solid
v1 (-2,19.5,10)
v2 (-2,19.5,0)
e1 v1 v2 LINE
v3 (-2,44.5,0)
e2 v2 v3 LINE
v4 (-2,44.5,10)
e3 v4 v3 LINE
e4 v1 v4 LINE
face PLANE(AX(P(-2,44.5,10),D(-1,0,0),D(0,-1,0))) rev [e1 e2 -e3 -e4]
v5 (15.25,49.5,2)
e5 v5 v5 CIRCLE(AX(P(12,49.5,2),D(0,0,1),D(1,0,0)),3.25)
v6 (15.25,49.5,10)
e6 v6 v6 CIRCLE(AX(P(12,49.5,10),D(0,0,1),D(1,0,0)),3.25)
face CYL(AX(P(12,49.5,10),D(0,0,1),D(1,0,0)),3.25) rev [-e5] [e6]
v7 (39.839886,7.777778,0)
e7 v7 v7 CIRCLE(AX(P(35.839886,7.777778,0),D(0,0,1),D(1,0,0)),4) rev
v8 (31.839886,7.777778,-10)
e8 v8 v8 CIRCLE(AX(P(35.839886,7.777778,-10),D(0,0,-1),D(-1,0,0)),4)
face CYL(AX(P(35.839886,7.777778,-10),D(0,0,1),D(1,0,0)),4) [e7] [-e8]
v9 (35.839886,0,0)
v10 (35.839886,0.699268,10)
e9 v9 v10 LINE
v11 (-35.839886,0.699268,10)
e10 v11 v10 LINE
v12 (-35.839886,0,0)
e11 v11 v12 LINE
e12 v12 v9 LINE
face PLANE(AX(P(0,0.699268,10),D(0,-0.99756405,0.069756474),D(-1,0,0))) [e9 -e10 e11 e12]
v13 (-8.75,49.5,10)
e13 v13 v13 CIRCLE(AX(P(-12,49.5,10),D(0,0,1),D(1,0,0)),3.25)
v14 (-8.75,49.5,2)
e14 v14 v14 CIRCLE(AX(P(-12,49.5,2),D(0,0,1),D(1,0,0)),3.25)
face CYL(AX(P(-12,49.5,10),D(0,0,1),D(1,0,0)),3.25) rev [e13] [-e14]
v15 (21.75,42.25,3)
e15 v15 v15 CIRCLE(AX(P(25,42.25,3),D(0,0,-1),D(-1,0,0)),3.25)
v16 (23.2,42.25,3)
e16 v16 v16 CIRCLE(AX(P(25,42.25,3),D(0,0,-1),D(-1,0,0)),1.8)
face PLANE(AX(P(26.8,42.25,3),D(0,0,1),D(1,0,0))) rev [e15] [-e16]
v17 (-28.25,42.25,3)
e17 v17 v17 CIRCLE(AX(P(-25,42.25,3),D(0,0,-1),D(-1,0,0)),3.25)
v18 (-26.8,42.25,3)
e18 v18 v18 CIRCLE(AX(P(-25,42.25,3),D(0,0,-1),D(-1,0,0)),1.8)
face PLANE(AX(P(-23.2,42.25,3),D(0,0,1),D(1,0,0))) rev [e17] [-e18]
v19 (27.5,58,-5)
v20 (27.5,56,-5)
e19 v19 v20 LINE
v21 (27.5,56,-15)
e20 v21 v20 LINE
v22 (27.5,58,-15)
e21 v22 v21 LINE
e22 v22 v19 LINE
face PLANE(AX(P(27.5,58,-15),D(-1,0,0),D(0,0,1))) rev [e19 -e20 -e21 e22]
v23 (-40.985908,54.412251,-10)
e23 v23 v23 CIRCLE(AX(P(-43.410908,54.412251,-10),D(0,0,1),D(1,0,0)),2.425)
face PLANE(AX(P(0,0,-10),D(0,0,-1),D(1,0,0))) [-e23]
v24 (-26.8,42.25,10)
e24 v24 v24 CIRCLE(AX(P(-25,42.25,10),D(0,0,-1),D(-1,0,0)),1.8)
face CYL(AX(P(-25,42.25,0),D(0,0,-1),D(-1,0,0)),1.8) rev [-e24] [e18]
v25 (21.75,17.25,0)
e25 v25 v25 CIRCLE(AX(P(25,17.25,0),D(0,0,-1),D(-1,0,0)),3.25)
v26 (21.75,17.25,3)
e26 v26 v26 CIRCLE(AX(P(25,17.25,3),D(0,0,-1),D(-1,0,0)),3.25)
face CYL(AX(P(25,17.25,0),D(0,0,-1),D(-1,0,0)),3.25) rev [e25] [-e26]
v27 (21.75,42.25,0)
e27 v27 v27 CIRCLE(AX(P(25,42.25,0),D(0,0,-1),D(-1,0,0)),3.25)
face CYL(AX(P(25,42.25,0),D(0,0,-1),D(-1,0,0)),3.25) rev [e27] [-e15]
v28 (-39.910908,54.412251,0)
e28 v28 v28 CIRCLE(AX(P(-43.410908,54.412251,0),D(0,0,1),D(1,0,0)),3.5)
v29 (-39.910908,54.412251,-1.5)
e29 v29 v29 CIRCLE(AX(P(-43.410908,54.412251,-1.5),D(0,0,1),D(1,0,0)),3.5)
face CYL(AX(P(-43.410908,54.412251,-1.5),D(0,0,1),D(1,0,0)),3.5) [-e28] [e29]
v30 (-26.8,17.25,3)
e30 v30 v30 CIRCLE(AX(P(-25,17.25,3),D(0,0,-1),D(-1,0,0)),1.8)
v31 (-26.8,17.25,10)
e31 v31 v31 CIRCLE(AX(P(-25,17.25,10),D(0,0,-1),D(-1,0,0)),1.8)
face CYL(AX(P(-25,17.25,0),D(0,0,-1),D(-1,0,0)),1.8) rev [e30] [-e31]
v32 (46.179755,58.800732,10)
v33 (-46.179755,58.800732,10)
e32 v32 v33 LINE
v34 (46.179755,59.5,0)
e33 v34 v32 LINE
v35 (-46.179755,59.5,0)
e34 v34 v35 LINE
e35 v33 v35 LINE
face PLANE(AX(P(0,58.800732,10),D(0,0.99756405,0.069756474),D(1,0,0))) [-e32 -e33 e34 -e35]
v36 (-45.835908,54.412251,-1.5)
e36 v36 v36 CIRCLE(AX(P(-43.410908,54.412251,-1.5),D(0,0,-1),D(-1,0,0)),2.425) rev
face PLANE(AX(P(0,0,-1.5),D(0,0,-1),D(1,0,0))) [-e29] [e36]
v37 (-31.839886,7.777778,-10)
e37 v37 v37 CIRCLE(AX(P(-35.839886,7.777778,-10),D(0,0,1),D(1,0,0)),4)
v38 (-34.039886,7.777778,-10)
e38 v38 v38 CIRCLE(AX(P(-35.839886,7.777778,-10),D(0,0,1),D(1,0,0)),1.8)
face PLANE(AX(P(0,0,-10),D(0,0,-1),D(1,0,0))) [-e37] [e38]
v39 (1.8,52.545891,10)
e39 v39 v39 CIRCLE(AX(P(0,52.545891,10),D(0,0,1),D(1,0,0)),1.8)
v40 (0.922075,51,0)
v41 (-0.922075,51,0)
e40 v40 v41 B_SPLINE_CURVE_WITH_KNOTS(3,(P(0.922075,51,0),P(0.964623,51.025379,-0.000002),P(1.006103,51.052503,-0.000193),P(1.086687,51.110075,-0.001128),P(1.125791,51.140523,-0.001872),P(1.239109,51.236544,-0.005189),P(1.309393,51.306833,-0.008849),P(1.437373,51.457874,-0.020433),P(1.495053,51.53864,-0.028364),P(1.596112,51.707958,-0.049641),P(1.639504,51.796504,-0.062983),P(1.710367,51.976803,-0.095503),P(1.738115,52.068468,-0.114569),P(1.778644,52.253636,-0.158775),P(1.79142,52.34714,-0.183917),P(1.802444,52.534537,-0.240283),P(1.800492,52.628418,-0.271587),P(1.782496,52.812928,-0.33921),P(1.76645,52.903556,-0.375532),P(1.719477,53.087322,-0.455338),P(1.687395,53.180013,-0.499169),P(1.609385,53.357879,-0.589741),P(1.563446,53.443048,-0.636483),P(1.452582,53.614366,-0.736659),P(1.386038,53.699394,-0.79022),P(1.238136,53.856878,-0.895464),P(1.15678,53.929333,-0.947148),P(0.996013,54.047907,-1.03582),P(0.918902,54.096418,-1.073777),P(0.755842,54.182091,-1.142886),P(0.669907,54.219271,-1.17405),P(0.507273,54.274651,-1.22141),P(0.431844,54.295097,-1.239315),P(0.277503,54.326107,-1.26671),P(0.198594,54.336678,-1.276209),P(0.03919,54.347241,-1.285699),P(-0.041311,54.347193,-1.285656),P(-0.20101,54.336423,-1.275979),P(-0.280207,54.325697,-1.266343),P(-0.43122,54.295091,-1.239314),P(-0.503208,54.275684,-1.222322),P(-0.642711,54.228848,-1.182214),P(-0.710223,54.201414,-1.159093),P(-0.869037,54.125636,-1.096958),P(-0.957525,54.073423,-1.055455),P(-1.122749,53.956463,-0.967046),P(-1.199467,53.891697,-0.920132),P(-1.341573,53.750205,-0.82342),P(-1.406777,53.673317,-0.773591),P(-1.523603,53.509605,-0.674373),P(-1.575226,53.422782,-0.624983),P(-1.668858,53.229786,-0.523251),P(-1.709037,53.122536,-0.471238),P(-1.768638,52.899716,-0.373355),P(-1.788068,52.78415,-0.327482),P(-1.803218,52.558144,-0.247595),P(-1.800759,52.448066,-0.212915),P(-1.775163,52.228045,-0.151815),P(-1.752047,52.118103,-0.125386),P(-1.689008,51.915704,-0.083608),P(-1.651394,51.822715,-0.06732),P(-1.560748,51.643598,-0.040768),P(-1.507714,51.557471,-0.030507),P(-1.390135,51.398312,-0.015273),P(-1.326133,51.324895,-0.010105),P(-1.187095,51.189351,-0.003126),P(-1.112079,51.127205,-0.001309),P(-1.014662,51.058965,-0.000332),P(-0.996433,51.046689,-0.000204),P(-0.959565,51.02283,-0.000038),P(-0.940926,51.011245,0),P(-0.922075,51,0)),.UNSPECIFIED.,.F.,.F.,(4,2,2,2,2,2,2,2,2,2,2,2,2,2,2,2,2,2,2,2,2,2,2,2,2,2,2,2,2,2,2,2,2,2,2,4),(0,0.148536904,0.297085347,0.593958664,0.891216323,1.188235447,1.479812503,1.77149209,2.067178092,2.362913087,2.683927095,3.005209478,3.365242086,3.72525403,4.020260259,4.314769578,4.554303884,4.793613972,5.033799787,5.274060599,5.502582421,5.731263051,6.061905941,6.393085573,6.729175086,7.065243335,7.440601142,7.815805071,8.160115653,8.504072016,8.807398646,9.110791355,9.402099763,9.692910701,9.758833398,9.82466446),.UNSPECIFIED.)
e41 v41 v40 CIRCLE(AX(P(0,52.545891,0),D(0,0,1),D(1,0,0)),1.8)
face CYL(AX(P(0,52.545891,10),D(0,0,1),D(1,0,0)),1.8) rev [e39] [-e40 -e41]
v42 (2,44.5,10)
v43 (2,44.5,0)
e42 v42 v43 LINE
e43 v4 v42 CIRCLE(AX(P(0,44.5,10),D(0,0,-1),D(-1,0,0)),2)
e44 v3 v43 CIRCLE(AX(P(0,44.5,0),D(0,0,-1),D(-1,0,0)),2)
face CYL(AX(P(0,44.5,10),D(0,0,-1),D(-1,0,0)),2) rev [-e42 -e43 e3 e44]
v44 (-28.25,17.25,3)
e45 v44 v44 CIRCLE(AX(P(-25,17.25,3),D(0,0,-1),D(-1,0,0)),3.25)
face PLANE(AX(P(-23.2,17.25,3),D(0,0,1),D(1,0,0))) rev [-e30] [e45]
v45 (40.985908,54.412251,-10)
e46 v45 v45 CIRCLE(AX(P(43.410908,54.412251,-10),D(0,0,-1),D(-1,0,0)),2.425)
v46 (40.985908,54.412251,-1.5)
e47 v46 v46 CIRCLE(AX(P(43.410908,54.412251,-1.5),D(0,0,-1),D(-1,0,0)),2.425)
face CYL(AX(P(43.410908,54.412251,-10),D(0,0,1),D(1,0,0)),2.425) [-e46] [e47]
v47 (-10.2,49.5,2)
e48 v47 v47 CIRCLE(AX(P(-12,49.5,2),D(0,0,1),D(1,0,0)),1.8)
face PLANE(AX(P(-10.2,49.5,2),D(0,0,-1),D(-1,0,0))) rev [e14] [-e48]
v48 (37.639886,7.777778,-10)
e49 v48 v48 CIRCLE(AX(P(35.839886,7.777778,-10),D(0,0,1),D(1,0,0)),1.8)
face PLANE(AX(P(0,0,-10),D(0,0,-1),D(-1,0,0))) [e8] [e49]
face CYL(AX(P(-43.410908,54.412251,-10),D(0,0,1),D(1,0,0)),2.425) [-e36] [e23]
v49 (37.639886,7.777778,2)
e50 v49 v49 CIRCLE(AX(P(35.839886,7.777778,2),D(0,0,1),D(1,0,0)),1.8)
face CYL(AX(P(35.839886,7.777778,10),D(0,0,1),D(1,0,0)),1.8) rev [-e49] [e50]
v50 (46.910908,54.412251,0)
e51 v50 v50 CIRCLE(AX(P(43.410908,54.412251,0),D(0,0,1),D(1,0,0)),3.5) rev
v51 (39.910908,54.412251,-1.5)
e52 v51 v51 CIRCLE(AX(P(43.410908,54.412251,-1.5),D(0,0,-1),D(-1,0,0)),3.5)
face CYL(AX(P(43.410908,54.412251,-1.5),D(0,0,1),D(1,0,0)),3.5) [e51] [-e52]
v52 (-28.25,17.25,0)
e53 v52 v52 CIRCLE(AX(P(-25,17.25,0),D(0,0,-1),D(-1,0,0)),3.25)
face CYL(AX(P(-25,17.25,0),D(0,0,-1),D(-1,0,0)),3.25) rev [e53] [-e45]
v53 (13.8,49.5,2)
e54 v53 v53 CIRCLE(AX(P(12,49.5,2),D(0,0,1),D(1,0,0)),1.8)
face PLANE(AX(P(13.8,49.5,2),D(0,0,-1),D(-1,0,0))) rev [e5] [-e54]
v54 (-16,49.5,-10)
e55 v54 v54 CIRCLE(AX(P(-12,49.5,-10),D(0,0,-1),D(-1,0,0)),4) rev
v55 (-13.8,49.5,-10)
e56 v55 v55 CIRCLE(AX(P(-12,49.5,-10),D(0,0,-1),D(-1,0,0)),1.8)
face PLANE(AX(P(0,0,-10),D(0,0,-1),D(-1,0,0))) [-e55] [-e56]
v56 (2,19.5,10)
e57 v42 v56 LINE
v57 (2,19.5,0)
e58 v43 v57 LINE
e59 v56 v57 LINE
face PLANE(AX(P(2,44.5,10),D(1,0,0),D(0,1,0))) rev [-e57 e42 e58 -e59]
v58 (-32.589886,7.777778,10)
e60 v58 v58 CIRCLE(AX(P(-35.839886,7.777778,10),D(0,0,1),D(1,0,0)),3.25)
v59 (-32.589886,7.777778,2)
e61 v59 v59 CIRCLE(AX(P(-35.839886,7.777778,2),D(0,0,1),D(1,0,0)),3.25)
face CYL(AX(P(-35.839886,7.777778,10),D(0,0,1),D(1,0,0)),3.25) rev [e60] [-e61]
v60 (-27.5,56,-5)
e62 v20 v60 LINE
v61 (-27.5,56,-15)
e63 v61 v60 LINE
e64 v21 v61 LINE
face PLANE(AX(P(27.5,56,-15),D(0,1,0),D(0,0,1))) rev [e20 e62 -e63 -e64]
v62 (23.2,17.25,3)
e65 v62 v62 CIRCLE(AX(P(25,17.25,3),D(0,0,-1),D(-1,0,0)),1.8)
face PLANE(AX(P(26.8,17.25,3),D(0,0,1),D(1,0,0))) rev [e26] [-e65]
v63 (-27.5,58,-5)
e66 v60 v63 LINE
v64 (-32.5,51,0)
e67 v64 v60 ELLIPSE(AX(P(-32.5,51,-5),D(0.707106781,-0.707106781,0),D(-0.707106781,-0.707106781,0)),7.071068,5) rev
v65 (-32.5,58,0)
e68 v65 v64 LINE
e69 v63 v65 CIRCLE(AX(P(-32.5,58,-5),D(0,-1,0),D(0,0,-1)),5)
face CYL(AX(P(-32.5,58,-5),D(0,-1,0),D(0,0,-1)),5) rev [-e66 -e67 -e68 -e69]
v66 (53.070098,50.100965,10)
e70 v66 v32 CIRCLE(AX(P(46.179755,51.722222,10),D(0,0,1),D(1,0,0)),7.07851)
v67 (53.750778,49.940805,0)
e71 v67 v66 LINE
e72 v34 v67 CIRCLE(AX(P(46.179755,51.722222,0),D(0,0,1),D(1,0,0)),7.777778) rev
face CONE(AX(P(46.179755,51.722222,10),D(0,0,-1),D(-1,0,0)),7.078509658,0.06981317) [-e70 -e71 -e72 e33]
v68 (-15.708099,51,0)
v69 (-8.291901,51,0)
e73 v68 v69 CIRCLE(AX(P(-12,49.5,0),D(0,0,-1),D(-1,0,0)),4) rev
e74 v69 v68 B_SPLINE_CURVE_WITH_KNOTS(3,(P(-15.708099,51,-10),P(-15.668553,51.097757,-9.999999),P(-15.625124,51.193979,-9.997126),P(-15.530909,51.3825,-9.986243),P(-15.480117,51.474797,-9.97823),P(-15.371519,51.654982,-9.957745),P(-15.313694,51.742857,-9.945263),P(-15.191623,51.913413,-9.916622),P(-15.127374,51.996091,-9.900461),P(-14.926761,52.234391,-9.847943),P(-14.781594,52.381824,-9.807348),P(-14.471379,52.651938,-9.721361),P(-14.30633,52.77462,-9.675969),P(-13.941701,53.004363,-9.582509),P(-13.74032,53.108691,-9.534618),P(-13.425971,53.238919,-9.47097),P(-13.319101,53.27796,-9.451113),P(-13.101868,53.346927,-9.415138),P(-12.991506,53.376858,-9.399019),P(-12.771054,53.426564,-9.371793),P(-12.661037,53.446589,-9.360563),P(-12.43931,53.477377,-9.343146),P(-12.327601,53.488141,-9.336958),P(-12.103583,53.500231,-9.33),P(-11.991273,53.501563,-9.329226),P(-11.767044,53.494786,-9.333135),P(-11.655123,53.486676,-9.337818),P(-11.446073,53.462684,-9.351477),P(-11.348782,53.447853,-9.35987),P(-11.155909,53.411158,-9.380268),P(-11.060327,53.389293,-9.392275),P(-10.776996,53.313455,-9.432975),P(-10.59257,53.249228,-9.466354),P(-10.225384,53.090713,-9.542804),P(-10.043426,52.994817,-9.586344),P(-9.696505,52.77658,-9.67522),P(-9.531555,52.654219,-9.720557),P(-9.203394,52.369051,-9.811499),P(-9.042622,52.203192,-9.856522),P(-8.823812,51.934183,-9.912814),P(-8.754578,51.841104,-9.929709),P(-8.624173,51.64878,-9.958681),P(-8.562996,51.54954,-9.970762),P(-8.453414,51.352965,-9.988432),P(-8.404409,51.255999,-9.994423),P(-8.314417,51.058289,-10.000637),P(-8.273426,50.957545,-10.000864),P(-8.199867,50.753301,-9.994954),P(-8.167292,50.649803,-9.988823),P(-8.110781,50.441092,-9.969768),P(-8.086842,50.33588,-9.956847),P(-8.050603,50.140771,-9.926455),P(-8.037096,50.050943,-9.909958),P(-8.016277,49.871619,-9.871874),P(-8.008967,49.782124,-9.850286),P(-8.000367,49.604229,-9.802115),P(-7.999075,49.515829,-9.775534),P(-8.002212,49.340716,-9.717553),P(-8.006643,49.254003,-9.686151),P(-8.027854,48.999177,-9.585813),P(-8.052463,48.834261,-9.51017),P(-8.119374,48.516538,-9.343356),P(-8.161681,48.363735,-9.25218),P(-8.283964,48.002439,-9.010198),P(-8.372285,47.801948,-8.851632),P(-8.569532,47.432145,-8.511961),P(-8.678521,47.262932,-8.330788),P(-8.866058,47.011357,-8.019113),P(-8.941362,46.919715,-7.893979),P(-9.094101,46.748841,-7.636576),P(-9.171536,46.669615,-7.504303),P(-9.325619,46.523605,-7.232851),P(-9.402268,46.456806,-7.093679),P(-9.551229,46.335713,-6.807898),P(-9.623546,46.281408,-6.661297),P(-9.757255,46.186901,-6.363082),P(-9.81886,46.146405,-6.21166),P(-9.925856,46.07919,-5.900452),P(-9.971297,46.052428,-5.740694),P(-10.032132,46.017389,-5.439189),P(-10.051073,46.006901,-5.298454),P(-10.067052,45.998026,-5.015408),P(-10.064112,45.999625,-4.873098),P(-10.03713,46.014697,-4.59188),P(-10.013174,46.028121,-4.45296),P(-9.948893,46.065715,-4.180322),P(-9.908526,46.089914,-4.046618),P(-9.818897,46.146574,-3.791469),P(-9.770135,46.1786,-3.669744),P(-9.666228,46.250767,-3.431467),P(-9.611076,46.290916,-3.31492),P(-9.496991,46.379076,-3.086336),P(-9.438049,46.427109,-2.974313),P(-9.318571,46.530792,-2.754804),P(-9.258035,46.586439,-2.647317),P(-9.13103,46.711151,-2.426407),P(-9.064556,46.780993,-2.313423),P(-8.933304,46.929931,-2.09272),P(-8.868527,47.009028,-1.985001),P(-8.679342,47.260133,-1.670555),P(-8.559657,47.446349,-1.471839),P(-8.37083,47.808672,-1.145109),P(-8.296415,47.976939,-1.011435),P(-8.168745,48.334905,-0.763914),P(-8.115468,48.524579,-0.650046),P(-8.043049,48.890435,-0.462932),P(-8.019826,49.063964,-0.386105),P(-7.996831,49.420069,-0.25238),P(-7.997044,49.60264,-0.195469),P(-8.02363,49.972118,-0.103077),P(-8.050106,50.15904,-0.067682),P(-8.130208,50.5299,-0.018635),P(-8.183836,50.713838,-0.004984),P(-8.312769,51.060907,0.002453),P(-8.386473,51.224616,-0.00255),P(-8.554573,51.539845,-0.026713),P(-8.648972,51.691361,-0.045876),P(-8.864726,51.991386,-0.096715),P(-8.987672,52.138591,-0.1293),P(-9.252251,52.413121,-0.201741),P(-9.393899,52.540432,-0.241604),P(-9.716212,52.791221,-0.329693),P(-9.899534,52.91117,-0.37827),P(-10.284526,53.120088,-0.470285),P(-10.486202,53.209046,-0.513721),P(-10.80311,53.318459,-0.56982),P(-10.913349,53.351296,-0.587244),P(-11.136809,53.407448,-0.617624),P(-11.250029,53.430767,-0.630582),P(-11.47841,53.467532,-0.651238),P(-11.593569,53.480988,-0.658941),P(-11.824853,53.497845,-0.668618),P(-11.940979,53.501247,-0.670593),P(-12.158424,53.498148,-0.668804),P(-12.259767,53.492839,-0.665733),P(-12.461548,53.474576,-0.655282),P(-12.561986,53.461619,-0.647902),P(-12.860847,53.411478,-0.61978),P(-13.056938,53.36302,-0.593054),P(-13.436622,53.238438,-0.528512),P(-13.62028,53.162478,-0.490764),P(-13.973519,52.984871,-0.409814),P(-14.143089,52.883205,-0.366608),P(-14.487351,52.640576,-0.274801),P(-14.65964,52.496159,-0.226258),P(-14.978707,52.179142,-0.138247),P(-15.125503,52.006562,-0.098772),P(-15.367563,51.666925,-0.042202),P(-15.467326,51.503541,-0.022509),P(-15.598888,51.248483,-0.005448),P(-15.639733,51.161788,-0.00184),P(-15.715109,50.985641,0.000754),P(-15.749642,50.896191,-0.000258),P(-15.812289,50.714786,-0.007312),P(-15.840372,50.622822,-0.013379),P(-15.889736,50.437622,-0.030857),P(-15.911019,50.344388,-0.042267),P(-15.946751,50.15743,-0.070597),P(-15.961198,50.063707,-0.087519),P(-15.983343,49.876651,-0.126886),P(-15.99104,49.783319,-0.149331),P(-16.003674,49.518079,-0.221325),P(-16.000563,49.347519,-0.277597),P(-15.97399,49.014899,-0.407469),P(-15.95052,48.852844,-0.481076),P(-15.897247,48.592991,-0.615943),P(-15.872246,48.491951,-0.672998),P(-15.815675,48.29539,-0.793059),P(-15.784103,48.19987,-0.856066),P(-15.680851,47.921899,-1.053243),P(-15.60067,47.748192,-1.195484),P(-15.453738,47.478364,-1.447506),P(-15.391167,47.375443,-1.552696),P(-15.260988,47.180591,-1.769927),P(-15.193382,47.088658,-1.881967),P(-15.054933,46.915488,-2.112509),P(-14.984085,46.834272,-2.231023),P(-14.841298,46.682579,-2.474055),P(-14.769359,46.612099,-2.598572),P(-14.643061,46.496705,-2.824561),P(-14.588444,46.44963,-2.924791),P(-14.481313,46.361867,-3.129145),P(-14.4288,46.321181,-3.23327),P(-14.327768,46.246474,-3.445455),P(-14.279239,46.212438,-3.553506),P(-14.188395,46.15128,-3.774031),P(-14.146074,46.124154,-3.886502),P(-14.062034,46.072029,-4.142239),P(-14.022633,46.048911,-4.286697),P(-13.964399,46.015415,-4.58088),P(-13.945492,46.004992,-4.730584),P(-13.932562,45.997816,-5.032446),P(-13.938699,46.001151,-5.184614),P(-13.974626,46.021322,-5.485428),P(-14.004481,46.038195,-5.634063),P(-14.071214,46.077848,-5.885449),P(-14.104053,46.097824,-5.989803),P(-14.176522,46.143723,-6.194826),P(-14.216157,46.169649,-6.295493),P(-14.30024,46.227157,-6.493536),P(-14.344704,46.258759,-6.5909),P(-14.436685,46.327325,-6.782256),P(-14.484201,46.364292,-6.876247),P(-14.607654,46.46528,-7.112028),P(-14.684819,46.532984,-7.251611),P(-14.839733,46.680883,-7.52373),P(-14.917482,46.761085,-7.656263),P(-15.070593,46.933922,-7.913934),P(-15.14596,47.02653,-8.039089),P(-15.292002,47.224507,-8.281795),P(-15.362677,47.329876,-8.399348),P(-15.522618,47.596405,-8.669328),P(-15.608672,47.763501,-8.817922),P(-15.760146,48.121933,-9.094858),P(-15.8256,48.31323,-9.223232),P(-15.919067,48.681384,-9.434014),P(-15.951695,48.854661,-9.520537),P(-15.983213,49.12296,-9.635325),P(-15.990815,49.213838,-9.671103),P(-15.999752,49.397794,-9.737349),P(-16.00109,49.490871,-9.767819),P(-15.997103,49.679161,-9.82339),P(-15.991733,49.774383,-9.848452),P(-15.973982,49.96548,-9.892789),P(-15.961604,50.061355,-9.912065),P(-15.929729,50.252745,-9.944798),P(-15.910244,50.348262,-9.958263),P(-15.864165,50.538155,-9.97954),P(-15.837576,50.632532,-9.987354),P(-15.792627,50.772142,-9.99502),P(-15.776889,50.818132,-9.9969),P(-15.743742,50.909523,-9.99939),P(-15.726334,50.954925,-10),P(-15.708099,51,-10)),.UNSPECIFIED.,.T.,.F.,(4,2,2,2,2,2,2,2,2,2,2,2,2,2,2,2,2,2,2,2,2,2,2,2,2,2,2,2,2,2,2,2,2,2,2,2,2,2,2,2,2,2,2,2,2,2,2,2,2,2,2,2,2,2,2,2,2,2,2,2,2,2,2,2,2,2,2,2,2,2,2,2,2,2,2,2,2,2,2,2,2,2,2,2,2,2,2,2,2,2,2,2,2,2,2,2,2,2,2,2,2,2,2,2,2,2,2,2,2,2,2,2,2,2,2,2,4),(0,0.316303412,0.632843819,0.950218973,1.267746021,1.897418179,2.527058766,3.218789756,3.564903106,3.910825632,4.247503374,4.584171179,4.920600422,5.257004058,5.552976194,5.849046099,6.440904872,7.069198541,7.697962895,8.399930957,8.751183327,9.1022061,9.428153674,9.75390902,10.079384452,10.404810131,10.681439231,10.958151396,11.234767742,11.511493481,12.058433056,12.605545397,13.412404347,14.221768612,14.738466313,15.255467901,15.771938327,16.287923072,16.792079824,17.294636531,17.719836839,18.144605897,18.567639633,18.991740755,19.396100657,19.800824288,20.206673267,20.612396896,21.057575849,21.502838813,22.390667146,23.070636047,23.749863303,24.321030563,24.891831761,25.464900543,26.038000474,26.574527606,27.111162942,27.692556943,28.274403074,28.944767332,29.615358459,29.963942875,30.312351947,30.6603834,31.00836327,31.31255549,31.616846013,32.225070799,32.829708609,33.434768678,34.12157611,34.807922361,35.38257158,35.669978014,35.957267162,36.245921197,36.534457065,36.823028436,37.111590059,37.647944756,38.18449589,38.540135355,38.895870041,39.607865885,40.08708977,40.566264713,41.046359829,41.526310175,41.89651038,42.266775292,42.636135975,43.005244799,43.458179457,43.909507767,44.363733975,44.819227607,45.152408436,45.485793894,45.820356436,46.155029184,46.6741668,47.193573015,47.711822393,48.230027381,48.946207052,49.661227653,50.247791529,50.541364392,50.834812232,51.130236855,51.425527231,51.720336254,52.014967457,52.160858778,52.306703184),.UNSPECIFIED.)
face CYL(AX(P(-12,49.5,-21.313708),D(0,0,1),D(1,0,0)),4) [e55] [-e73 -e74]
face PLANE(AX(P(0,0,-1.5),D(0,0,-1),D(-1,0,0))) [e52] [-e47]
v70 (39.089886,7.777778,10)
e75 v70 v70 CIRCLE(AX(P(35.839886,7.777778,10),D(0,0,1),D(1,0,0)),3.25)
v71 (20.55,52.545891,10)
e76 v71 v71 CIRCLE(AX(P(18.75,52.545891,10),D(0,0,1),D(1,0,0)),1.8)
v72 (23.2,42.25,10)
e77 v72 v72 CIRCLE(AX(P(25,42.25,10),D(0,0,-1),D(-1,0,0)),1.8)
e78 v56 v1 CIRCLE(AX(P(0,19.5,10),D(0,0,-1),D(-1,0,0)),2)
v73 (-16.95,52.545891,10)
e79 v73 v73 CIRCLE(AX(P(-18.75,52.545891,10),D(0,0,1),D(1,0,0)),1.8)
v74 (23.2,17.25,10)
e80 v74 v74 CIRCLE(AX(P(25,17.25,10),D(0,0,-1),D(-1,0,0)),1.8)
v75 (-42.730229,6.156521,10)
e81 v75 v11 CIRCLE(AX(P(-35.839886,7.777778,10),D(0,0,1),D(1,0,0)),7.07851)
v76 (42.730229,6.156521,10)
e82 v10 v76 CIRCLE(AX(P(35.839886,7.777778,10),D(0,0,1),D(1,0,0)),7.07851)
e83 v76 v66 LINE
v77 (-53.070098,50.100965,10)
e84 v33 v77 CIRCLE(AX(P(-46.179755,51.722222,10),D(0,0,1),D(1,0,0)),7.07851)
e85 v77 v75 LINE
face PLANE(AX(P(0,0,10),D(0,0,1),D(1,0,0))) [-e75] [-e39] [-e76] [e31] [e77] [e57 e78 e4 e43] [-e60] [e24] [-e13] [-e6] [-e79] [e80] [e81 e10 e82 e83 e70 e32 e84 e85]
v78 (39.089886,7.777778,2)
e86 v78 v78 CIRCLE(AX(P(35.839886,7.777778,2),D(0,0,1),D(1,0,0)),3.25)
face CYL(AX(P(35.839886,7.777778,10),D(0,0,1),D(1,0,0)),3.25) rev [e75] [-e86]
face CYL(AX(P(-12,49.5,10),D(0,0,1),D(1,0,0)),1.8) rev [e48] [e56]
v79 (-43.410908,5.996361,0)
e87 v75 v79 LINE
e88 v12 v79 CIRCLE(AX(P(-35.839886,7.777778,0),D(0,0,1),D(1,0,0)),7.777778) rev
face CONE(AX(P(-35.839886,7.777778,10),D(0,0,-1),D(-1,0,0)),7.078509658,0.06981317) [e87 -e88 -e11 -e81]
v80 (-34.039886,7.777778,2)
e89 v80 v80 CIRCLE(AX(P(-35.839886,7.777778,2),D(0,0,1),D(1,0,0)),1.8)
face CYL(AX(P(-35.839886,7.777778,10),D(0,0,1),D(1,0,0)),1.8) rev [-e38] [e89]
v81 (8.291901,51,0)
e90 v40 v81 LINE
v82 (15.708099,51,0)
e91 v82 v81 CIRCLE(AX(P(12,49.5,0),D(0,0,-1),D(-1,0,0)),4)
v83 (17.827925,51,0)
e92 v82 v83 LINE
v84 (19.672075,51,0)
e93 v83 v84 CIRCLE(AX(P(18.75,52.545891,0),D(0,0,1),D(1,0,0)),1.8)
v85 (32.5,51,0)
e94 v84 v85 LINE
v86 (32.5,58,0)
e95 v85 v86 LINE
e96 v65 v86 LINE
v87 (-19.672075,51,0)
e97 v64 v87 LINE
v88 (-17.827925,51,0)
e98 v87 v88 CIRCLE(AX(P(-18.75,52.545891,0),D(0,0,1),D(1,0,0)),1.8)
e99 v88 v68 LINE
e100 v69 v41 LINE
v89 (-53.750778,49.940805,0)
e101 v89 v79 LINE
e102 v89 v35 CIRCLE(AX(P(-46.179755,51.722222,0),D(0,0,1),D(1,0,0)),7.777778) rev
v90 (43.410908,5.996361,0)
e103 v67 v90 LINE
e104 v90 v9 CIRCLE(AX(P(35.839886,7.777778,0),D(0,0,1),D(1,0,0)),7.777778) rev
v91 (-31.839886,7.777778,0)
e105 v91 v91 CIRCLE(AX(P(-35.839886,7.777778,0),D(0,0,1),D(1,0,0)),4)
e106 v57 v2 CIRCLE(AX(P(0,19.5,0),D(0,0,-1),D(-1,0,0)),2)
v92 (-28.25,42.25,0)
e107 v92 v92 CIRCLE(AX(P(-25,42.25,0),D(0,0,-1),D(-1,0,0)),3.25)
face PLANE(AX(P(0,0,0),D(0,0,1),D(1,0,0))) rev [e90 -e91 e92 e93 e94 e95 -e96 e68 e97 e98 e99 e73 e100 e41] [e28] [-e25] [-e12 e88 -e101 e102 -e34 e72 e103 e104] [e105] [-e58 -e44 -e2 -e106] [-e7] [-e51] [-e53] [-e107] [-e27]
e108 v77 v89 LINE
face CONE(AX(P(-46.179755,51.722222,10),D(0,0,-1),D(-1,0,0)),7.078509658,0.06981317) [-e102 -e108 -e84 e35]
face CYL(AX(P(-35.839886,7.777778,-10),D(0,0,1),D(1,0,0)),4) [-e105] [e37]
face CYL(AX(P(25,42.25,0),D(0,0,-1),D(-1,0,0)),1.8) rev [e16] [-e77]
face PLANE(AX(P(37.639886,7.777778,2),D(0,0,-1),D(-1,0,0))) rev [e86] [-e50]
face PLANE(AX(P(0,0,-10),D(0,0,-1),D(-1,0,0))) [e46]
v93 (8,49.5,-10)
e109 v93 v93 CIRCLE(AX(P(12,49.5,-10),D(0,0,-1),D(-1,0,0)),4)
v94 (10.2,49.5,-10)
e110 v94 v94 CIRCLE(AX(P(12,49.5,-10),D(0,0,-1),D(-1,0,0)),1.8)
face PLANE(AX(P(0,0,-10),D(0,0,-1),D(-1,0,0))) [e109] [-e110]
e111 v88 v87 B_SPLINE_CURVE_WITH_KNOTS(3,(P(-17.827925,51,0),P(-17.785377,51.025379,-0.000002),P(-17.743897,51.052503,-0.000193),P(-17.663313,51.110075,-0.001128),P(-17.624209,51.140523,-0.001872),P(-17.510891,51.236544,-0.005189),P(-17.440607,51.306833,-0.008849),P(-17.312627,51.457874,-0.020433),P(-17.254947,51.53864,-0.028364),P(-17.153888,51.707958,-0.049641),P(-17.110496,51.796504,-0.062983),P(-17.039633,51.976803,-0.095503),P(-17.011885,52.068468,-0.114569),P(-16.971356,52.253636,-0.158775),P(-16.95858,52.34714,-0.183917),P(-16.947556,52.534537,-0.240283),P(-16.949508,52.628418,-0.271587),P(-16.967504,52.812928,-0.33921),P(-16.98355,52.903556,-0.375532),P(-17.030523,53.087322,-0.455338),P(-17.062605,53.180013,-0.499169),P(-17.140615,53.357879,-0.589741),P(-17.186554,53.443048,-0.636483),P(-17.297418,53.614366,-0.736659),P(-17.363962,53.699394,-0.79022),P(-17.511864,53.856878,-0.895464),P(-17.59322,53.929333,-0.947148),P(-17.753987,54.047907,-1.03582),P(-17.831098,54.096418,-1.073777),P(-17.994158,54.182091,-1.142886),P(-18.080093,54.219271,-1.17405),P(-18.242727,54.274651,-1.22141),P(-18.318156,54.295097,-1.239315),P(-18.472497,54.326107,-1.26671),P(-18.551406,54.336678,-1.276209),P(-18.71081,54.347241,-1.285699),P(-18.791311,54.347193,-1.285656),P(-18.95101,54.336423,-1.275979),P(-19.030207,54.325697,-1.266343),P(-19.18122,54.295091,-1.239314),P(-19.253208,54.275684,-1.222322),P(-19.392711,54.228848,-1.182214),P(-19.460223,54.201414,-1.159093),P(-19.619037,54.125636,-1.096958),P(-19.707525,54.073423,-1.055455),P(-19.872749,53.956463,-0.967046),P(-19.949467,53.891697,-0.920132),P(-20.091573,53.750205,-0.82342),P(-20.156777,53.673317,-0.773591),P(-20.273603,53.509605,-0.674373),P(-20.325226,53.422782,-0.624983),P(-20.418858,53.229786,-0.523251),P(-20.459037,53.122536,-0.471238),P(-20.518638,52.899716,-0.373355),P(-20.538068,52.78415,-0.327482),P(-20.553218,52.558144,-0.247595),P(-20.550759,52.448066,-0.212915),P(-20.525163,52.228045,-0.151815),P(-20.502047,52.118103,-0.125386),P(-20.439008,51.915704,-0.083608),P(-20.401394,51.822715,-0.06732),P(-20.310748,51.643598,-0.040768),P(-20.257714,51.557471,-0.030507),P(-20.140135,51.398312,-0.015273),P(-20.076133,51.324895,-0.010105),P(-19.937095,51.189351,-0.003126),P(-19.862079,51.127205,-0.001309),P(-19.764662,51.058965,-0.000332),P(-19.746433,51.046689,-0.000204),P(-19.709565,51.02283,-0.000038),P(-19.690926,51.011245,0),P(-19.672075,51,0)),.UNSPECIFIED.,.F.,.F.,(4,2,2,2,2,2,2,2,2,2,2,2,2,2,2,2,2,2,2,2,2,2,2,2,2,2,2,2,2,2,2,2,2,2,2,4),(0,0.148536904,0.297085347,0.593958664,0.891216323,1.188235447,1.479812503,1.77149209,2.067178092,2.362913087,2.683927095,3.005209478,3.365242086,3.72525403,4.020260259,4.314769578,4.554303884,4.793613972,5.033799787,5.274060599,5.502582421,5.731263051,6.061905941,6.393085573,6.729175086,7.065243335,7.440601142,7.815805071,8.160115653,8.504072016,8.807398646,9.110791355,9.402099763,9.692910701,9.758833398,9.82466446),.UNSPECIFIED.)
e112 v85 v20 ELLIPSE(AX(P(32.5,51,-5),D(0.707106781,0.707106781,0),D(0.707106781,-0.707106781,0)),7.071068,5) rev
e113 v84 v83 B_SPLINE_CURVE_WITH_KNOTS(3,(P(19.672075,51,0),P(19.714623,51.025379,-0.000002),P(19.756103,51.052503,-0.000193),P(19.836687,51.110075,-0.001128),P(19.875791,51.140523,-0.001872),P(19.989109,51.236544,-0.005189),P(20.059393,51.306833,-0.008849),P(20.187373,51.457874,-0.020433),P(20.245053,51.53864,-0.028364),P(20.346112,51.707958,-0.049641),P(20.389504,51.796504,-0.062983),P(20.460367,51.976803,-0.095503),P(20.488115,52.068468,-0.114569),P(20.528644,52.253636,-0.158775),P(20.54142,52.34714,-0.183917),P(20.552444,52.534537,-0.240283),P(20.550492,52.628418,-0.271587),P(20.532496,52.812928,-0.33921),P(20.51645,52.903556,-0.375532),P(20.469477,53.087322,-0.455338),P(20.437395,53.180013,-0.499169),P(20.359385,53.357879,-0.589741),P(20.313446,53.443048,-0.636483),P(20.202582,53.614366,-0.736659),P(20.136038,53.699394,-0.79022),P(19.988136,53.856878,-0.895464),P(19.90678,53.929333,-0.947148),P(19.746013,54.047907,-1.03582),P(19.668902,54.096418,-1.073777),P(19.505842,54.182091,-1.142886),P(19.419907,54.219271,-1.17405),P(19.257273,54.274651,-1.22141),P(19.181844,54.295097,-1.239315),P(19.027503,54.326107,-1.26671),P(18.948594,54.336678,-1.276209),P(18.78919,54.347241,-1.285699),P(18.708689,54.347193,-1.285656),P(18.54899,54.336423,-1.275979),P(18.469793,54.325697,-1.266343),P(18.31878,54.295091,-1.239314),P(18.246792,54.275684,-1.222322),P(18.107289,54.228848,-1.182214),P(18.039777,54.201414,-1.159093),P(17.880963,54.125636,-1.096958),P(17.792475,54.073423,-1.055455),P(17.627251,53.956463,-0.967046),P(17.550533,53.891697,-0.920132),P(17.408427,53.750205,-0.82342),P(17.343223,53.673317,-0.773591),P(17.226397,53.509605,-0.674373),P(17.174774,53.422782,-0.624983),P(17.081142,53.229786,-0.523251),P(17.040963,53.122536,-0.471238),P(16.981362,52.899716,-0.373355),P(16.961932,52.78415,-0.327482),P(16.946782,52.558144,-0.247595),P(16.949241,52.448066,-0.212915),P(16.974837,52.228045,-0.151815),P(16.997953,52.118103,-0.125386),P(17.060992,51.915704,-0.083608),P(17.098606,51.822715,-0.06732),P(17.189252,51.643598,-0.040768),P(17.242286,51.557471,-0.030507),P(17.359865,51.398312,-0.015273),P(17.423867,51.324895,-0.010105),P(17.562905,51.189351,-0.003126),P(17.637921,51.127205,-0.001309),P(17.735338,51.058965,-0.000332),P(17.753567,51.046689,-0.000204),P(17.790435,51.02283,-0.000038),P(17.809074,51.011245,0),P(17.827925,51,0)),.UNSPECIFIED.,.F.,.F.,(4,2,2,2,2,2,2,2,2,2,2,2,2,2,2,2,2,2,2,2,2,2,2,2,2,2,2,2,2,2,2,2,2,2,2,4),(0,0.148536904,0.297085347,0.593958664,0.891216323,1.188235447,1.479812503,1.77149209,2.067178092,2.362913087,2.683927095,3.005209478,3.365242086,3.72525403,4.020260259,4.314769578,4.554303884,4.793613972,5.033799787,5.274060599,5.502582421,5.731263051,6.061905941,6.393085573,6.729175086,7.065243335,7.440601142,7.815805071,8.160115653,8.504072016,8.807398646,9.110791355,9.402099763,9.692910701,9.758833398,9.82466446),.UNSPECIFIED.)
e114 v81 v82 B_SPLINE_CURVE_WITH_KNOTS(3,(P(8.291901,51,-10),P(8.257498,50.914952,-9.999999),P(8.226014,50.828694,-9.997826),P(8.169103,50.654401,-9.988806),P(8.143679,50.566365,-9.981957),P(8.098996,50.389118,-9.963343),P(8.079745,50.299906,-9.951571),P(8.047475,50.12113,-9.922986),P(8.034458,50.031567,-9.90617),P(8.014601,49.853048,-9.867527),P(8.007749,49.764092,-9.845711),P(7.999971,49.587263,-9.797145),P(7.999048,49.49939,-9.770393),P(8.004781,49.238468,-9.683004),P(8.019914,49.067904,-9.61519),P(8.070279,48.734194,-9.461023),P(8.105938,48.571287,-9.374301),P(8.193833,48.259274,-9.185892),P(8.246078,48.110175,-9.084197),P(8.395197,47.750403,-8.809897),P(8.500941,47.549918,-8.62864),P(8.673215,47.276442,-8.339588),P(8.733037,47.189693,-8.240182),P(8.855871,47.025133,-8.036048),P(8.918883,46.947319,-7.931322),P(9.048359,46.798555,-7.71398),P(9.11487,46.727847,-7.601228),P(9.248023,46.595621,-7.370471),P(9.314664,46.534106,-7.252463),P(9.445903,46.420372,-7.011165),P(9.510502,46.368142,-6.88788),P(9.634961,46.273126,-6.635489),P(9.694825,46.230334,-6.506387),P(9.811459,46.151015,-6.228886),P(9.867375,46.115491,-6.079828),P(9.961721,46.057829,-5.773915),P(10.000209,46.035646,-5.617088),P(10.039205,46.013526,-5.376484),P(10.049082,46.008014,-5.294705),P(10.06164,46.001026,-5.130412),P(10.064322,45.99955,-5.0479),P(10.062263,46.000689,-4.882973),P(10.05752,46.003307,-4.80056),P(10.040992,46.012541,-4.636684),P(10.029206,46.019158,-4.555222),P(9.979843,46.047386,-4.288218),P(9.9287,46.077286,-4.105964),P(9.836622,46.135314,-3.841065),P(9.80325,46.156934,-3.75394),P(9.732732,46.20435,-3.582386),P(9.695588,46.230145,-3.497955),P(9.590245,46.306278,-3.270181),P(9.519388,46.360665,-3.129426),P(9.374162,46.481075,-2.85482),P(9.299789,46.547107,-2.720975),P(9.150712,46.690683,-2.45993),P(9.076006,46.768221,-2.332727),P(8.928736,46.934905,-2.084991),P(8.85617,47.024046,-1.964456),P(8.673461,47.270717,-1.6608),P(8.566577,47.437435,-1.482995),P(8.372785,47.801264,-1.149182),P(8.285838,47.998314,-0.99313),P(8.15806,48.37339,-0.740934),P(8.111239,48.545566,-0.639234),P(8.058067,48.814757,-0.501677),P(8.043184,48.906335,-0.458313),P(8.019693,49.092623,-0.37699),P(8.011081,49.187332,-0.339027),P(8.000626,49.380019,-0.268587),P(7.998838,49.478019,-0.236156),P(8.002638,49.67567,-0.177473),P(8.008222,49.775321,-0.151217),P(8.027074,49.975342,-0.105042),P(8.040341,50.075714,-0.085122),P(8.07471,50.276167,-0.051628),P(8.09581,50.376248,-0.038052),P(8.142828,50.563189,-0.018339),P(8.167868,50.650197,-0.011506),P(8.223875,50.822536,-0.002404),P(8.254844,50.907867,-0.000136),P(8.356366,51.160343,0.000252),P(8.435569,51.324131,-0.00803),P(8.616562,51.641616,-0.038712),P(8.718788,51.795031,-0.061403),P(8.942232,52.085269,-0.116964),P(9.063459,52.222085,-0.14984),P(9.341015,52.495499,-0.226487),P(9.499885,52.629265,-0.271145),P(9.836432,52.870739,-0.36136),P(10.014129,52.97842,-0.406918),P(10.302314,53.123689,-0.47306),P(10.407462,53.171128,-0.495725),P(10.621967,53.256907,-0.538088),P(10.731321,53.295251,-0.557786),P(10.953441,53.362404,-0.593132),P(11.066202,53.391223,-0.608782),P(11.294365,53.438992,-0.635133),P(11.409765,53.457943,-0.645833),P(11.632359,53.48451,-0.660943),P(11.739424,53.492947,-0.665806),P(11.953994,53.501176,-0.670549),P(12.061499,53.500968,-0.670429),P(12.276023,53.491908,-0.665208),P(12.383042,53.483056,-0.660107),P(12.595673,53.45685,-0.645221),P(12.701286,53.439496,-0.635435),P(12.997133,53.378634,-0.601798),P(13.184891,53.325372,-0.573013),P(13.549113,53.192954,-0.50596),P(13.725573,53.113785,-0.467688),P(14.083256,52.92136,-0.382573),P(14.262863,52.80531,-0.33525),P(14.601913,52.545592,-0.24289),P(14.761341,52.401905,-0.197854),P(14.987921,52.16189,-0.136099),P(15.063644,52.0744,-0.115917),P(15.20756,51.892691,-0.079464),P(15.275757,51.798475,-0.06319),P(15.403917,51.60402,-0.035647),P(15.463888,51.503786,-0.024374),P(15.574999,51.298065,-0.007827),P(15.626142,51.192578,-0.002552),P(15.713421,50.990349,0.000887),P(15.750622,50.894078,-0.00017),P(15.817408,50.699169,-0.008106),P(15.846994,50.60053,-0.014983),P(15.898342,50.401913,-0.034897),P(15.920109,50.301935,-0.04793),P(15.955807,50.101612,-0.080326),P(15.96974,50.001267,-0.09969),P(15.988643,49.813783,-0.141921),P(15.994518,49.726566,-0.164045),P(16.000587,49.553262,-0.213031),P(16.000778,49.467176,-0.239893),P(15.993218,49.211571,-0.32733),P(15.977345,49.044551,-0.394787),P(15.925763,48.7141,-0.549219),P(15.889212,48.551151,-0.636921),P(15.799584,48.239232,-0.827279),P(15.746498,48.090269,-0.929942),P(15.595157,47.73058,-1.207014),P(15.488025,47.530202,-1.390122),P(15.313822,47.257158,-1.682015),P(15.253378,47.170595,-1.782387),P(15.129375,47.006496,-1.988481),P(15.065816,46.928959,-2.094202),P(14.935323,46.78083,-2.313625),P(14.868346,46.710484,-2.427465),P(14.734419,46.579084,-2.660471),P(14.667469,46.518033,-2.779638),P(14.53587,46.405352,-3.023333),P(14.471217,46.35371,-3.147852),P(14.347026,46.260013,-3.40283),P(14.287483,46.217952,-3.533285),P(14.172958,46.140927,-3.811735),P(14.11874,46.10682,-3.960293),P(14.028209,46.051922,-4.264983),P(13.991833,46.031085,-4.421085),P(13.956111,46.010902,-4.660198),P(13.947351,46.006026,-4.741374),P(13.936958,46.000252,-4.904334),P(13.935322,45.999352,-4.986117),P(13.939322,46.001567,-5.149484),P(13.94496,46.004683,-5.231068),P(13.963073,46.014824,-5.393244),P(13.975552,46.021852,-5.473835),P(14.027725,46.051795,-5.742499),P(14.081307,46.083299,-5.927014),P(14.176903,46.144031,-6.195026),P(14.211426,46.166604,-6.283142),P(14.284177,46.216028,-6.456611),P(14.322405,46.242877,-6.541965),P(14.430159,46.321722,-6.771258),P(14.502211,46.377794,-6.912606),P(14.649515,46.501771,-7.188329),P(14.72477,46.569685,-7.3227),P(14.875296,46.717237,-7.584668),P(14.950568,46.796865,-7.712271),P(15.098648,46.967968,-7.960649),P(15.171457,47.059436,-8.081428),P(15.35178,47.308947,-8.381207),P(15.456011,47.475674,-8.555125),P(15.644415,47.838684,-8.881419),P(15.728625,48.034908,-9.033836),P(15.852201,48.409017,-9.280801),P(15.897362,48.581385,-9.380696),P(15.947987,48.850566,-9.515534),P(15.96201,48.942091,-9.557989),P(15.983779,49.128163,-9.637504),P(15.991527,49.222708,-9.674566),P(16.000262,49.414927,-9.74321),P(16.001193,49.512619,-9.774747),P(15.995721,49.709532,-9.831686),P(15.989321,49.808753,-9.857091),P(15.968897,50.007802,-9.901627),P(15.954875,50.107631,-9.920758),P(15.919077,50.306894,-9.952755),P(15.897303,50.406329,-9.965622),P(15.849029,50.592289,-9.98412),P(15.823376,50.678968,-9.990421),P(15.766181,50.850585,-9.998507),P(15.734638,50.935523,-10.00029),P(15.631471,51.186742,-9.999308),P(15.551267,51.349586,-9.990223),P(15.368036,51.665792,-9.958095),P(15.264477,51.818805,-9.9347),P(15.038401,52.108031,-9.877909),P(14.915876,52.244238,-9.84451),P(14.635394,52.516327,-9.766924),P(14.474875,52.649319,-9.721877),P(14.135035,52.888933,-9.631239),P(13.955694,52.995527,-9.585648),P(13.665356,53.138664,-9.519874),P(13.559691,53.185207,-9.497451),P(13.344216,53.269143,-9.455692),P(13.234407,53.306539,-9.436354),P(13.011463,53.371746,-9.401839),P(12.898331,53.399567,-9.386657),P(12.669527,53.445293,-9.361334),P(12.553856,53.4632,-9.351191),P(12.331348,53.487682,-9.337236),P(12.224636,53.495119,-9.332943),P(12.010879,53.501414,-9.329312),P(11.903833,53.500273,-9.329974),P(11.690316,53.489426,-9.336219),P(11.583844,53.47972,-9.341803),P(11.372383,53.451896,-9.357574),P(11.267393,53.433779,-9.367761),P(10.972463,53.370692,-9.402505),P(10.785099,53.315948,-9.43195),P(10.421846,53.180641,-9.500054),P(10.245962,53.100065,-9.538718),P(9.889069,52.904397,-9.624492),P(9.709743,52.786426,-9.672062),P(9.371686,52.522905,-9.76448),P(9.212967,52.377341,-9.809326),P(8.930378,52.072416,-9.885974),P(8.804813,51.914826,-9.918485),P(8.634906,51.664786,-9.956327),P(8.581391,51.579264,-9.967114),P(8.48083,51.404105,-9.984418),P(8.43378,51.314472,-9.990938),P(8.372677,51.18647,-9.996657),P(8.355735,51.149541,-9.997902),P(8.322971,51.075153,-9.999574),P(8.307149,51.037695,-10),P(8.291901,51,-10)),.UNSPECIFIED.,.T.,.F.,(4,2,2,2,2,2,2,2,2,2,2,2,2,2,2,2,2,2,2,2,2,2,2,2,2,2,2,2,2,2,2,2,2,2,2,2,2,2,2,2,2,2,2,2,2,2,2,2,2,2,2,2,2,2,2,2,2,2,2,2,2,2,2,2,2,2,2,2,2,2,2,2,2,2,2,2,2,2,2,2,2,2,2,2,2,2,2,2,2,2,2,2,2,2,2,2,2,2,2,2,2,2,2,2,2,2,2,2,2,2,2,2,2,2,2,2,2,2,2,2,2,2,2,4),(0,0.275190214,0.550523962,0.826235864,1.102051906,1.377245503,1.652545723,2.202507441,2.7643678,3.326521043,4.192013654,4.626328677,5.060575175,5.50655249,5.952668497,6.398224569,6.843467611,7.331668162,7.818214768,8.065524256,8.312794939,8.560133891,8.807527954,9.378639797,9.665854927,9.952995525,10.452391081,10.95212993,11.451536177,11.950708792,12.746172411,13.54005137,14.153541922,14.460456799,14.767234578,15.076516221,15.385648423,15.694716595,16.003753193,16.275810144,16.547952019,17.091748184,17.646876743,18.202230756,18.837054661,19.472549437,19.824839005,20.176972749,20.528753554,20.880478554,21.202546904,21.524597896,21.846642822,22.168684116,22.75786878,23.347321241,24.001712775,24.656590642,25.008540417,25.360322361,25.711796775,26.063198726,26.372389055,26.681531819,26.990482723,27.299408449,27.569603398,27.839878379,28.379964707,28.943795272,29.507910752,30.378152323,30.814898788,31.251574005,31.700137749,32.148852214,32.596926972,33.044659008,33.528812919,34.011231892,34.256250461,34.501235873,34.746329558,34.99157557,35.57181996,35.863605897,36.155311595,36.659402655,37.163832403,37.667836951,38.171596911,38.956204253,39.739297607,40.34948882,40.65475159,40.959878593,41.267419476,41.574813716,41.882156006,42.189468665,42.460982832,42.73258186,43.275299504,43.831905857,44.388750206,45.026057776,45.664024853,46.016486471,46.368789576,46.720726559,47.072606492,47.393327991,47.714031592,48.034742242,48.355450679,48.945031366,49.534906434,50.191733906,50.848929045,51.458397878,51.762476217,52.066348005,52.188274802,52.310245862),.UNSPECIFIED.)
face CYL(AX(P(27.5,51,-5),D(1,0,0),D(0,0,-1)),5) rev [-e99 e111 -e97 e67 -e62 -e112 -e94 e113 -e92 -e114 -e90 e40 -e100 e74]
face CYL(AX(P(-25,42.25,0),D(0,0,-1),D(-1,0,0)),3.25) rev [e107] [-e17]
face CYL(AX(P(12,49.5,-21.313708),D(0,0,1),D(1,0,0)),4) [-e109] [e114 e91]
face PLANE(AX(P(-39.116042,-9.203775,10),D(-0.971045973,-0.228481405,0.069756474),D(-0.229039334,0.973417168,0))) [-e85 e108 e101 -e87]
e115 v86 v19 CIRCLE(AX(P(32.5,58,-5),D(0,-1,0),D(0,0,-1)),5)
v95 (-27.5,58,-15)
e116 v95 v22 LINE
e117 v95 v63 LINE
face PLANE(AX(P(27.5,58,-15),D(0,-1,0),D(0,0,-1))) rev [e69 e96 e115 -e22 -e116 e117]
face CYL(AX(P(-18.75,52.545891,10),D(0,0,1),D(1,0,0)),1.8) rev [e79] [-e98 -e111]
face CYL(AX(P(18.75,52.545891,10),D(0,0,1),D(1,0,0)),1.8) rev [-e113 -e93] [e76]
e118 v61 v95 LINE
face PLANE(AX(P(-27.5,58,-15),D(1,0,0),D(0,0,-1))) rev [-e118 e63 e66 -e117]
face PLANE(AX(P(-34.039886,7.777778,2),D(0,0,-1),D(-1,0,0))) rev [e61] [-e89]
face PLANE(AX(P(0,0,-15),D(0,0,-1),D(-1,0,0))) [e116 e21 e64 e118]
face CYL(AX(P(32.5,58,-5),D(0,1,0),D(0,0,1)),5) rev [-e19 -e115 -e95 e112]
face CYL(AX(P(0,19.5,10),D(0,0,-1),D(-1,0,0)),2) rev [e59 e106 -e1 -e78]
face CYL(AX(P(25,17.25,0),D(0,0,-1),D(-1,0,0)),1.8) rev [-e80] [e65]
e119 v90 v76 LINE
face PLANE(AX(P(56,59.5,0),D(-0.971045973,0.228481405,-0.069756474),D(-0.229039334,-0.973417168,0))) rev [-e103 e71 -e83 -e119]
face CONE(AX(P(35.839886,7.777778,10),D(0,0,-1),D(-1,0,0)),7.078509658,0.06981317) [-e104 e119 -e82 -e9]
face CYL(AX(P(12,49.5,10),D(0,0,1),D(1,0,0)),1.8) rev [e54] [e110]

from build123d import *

# Parameters (mm, degrees)
BOSS_EXTRUDE2_DEPTH              = 10
FILLET1_R                        = 7.777777778
SKETCH11_R                       = 2.425
SKETCH11_R_2                     = 4
BOSS_EXTRUDE3_DEPTH              = 10
CHAMFER1_SIZE                    = 0.699268119
CHAMFER1_SIZE_2                  = 10
SKETCH11_4_R                     = 3.5
SKETCH11_4_R_2                   = 2.425
BOSS_EXTRUDE4_DEPTH              = 1.5
CBORE_FOR_M3_SHCS2_D             = 3.6
CBORE_FOR_M3_SHCS2_CBORE_D       = 6.5
CBORE_FOR_M3_SHCS2_CBORE_DEPTH   = 8
CUT_EXTRUDE4_DEPTH               = 81.942358333
SKETCH31_W                       = 55
SKETCH31_H                       = 2
BOSS_EXTRUDE5_DEPTH              = 15
FILLET2_R                        = 5
CBORE_FOR_M3_SHCS3_OUTLINE_R     = 1.8
CBORE_FOR_M3_SHCS3_DEPTH         = 10
CBORE_FOR_M3_SHCS3_2_OUTLINE_R   = 3.25
CBORE_FOR_M3_SHCS3_2_OUTLINE_R_2 = 1.8
CBORE_FOR_M3_SHCS3_2_DEPTH       = 3
M3_CLEARANCE_HOLE4_D             = 3.6
SKETCH43_R                       = 4
BOSS_EXTRUDE6_DEPTH              = 10
CBORE_START                      = 2
CBORE_FOR_M3_SHCS4_OUTLINE_R     = 3.25
CBORE_FOR_M3_SHCS4_DEPTH         = 8
CBORE_START_2                    = -10
CBORE_FOR_M3_SHCS4_2_OUTLINE_R   = 1.8
CBORE_FOR_M3_SHCS4_2_DEPTH       = 12


# Read off the part's stored shape, not the designer's step: CBORE for M3 SHCS3, CBORE for M3 SHCS4
with BuildPart() as part:
    # Sketch9 → Boss-Extrude2 (new body)
    with BuildSketch(Plane.XY):
        Polygon((0, 0), (0, 59.5), (-56, 59.5), (-42, 0), align=None)
    boss_extrude2 = extrude(amount=BOSS_EXTRUDE2_DEPTH)

    # Mirror2: Boss-Extrude2 across plane
    add(boss_extrude2.mirror(Plane(origin=(0, 0, 10), x_dir=(0, 0, 1), z_dir=(-1, 0, 0))))

    # Fillet1
    fillet1_edges = [part.edges().sort_by_distance(p)[0] for p in [
        (42, 0, 5),
        (56, 59.5, 5),
        (-42, 0, 5),
        (-56, 59.5, 5),
    ]]
    fillet(fillet1_edges, radius=FILLET1_R)

    # Sketch11 → Boss-Extrude3 (add)
    with BuildSketch(Plane(origin=(0, 0, 0), x_dir=(-1, 0, 0), z_dir=(0, 0, -1))):
        with Locations(Location((-43.410908409, 54.412250943, 0), (0, 0, 180))):
            Circle(SKETCH11_R)
        with Locations(Location((-35.839885988, 7.777777778, 0), (0, 0, 180))):
            Circle(SKETCH11_R_2)
    boss_extrude3 = extrude(amount=BOSS_EXTRUDE3_DEPTH)

    # Chamfer1
    # the kernel refuses this chamfer: 10, 0.699268119 mm, written as the material it takes off along each edge
    with BuildSketch(Plane(origin=(-35.839885988, 0, 10), x_dir=(0, 0.8766829747338895, 0.48106856248536783), z_dir=(1, 0, 0))) as chamfer1_piece_1:
        Polygon((CHAMFER1_SIZE * 0.876682975279, -CHAMFER1_SIZE * 0.481068562785), (-CHAMFER1_SIZE_2 * 0.481068562485, -CHAMFER1_SIZE_2 * 0.876682974734), (0, 0), align=None)
    extrude(amount=71.679771977, mode=Mode.SUBTRACT)
    with BuildSketch(Plane(origin=(35.839885988, 7.777777778, 10), x_dir=(0, -1, 0), z_dir=(-1, 0, 0))) as chamfer1_piece_2:
        Polygon((7.777777778 - CHAMFER1_SIZE, 0), (7.777777778, -CHAMFER1_SIZE_2), (7.777777778, 0), align=None)
    revolve(axis=Axis((35.839885988, 7.777777778, 10), (0, 0, 1)), revolution_arc=76.759480085, mode=Mode.SUBTRACT)
    with BuildSketch(Plane(origin=(-35.839885988, 7.777777778, 10), x_dir=(0, -1, 0), z_dir=(1, 0, 0))) as chamfer1_piece_3:
        Polygon((7.777777778 - CHAMFER1_SIZE, 0), (7.777777778, CHAMFER1_SIZE_2), (7.777777778, 0), align=None)
    revolve(axis=Axis((-35.839885988, 7.777777778, 10), (0, 0, -1)), revolution_arc=76.759480085, mode=Mode.SUBTRACT)
    with BuildSketch(Plane(origin=(53.75077769, 49.940805182, 10), x_dir=(-0.8533782587917171, 0.2007948844215805, 0.4810685624853707), z_dir=(-0.2290393337255473, -0.973417168333576, 0))) as chamfer1_piece_4:
        Polygon((CHAMFER1_SIZE * 0.876682975279, CHAMFER1_SIZE * 0.481068562785), (-CHAMFER1_SIZE_2 * 0.481068562485, CHAMFER1_SIZE_2 * 0.876682974734), (0, 0), align=None)
    extrude(amount=45.144513446, mode=Mode.SUBTRACT)
    with BuildSketch(Plane(origin=(-53.75077769, 49.940805182, 10), x_dir=(0.8533782587917171, 0.2007948844215805, 0.4810685624853707), z_dir=(0.2290393337255473, -0.973417168333576, 0))) as chamfer1_piece_5:
        Polygon((CHAMFER1_SIZE * 0.876682975279, -CHAMFER1_SIZE * 0.481068562785), (-CHAMFER1_SIZE_2 * 0.481068562485, -CHAMFER1_SIZE_2 * 0.876682974734), (0, 0), align=None)
    extrude(amount=45.144513446, mode=Mode.SUBTRACT)
    with BuildSketch(Plane(origin=(46.17975527, 51.722222222, 10), x_dir=(0, 1, 0), z_dir=(-1, 0, 0))) as chamfer1_piece_6:
        Polygon((7.777777778, CHAMFER1_SIZE_2), (7.777777778 - CHAMFER1_SIZE, 0), (7.777777778, 0), align=None)
    revolve(axis=Axis((46.17975527, 51.722222222, 10), (0, 0, -1)), revolution_arc=103.240519915, mode=Mode.SUBTRACT)
    with BuildSketch(Plane(origin=(-46.17975527, 51.722222222, 10), x_dir=(0, 1, 0), z_dir=(1, 0, 0))) as chamfer1_piece_7:
        Polygon((7.777777778, -CHAMFER1_SIZE_2), (7.777777778 - CHAMFER1_SIZE, 0), (7.777777778, 0), align=None)
    revolve(axis=Axis((-46.17975527, 51.722222222, 10), (0, 0, 1)), revolution_arc=103.240519915, mode=Mode.SUBTRACT)
    with BuildSketch(Plane(origin=(-46.17975527, 59.5, 10), x_dir=(0, 0.0026831830283774233, -0.9999964002579389), z_dir=(1, 0, 0))) as chamfer1_piece_8:
        Polygon((CHAMFER1_SIZE_2 * 0.999996400258, -CHAMFER1_SIZE_2 * 0.00268318302838), (-CHAMFER1_SIZE * 0.00268318303005, -CHAMFER1_SIZE * 0.99999640088), (0, 0), align=None)
    extrude(amount=92.359510539, mode=Mode.SUBTRACT)

    # Sketch11<4> → Boss-Extrude4 (add)
    with BuildSketch(Plane(origin=(0, 0, 0), x_dir=(-1, 0, 0), z_dir=(0, 0, -1))):
        with Locations(Location((-43.410908409, 54.412250943, 0), (0, 0, 180))):
            Circle(SKETCH11_4_R)
        with Locations((-43.410908409, 54.412250943)):
            Circle(SKETCH11_4_R_2, mode=Mode.SUBTRACT)
    boss_extrude4 = extrude(amount=BOSS_EXTRUDE4_DEPTH)

    # Mirror3: Boss-Extrude3, Boss-Extrude4 across plane
    add(boss_extrude3.mirror(Plane(origin=(0, 0, 0), x_dir=(0, 0, 1), z_dir=(1, 0, 0))))
    add(boss_extrude4.mirror(Plane(origin=(0, 0, 0), x_dir=(0, 0, 1), z_dir=(1, 0, 0))))

    # CBORE for M3 SHCS2 (through all)
    with Locations(Plane.XY.offset(10)):
        with Locations((35.839885988, 7.777777778)):
            cbore_for_m3_shcs2 = CounterBoreHole(CBORE_FOR_M3_SHCS2_D / 2, CBORE_FOR_M3_SHCS2_CBORE_D / 2, CBORE_FOR_M3_SHCS2_CBORE_DEPTH)

    # Mirror4: CBORE for M3 SHCS2 across plane
    add(cbore_for_m3_shcs2.mirror(Plane(origin=(0, 0, 0), x_dir=(0, 0, 1), z_dir=(1, 0, 0))), mode=Mode.SUBTRACT)

    # Sketch30 → Cut-Extrude4 (cut, through all)
    with BuildSketch(Plane(origin=(0, 0, 0), x_dir=(-1, 0, 0), z_dir=(0, 0, -1))):
        with BuildLine():
            Line((2, 44.5), (2, 19.5))
            ThreePointArc((2, 19.5), (0, 17.5), (-2, 19.5))
            Line((-2, 19.5), (-2, 44.5))
            ThreePointArc((-2, 44.5), (0, 46.5), (2, 44.5))
        make_face()
    extrude(amount=-CUT_EXTRUDE4_DEPTH, mode=Mode.SUBTRACT)

    # Sketch31 → Boss-Extrude5 (add)
    with BuildSketch(Plane(origin=(0, 0, 0), x_dir=(-1, 0, 0), z_dir=(0, 0, -1))):
        with Locations((0, 57)):
            Rectangle(SKETCH31_W, SKETCH31_H)
    extrude(amount=BOSS_EXTRUDE5_DEPTH)

    # Fillet2
    fillet2_edges = [part.edges().sort_by_distance(p)[0] for p in [
        (-27.5, 57, 0),
        (27.5, 57, 0),
        (0, 56, 0),
    ]]
    fillet(fillet2_edges, radius=FILLET2_R)

    # CBORE for M3 SHCS3 outline → CBORE for M3 SHCS3 (cut)
    with BuildSketch(Plane.XY):
        with Locations((25, 17.25)):
            Circle(CBORE_FOR_M3_SHCS3_OUTLINE_R)
        with Locations((-25, 17.25)):
            Circle(CBORE_FOR_M3_SHCS3_OUTLINE_R)
        with Locations((-25, 42.25)):
            Circle(CBORE_FOR_M3_SHCS3_OUTLINE_R)
        with Locations((25, 42.25)):
            Circle(CBORE_FOR_M3_SHCS3_OUTLINE_R)
    extrude(amount=CBORE_FOR_M3_SHCS3_DEPTH, mode=Mode.SUBTRACT)

    # CBORE for M3 SHCS3 2 outline → CBORE for M3 SHCS3 2 (cut)
    # profile 1 of 4: a face of its own
    with BuildSketch(Plane.XY):
        with Locations((25, 17.25)):
            Circle(CBORE_FOR_M3_SHCS3_2_OUTLINE_R)
        with Locations((25, 17.25)):
            Circle(CBORE_FOR_M3_SHCS3_2_OUTLINE_R_2, mode=Mode.SUBTRACT)
    # profile 2 of 4: a face of its own
    with BuildSketch(Plane.XY):
        with Locations((-25, 17.25)):
            Circle(CBORE_FOR_M3_SHCS3_2_OUTLINE_R)
        with Locations((-25, 17.25)):
            Circle(CBORE_FOR_M3_SHCS3_2_OUTLINE_R_2, mode=Mode.SUBTRACT)
    # profile 3 of 4: a face of its own
    with BuildSketch(Plane.XY):
        with Locations((-25, 42.25)):
            Circle(CBORE_FOR_M3_SHCS3_2_OUTLINE_R)
        with Locations((-25, 42.25)):
            Circle(CBORE_FOR_M3_SHCS3_2_OUTLINE_R_2, mode=Mode.SUBTRACT)
    # profile 4 of 4: a face of its own
    with BuildSketch(Plane.XY):
        with Locations((25, 42.25)):
            Circle(CBORE_FOR_M3_SHCS3_2_OUTLINE_R)
        with Locations((25, 42.25)):
            Circle(CBORE_FOR_M3_SHCS3_2_OUTLINE_R_2, mode=Mode.SUBTRACT)
    extrude(amount=CBORE_FOR_M3_SHCS3_2_DEPTH, mode=Mode.SUBTRACT)

    # M3 Clearance Hole4 (through all)
    with Locations(Plane.XY.offset(10)):
        with Locations((-18.75, 52.54589051), (0, 52.54589051), (18.75, 52.54589051)):
            Hole(M3_CLEARANCE_HOLE4_D / 2)

    # Sketch43 → Boss-Extrude6 (add)
    with BuildSketch(Plane(origin=(0, 0, 0), x_dir=(-1, 0, 0), z_dir=(0, 0, -1))):
        with BuildLine():
            ThreePointArc((8.291900756, 51), (11.23593095, 45.57365329), (16, 49.5))
            ThreePointArc((16, 49.5), (15.92634671, 50.26406905), (15.708099244, 51))
            Line((15.708099244, 51), (8.291900756, 51))
        make_face()
        with BuildLine():
            Line((8.291900756, 51), (15.708099244, 51))
            ThreePointArc((15.708099244, 51), (12, 53.5), (8.291900756, 51))
        make_face()
        with Locations(Location((-12, 49.5, 0), (0, 0, 157.975687163))):
            Circle(SKETCH43_R)
    extrude(amount=BOSS_EXTRUDE6_DEPTH)

    # CBORE for M3 SHCS4 outline → CBORE for M3 SHCS4 (cut)
    with BuildSketch(Plane.XY.offset(CBORE_START)):
        with Locations((-12, 49.5)):
            Circle(CBORE_FOR_M3_SHCS4_OUTLINE_R)
        with Locations((12, 49.5)):
            Circle(CBORE_FOR_M3_SHCS4_OUTLINE_R)
    extrude(amount=CBORE_FOR_M3_SHCS4_DEPTH, mode=Mode.SUBTRACT)

    # CBORE for M3 SHCS4 2 outline → CBORE for M3 SHCS4 2 (cut)
    with BuildSketch(Plane.XY.offset(CBORE_START_2)):
        with Locations((-12, 49.5)):
            Circle(CBORE_FOR_M3_SHCS4_2_OUTLINE_R)
        with Locations((12, 49.5)):
            Circle(CBORE_FOR_M3_SHCS4_2_OUTLINE_R)
    extrude(amount=CBORE_FOR_M3_SHCS4_2_DEPTH, mode=Mode.SUBTRACT)


solid = part.part
